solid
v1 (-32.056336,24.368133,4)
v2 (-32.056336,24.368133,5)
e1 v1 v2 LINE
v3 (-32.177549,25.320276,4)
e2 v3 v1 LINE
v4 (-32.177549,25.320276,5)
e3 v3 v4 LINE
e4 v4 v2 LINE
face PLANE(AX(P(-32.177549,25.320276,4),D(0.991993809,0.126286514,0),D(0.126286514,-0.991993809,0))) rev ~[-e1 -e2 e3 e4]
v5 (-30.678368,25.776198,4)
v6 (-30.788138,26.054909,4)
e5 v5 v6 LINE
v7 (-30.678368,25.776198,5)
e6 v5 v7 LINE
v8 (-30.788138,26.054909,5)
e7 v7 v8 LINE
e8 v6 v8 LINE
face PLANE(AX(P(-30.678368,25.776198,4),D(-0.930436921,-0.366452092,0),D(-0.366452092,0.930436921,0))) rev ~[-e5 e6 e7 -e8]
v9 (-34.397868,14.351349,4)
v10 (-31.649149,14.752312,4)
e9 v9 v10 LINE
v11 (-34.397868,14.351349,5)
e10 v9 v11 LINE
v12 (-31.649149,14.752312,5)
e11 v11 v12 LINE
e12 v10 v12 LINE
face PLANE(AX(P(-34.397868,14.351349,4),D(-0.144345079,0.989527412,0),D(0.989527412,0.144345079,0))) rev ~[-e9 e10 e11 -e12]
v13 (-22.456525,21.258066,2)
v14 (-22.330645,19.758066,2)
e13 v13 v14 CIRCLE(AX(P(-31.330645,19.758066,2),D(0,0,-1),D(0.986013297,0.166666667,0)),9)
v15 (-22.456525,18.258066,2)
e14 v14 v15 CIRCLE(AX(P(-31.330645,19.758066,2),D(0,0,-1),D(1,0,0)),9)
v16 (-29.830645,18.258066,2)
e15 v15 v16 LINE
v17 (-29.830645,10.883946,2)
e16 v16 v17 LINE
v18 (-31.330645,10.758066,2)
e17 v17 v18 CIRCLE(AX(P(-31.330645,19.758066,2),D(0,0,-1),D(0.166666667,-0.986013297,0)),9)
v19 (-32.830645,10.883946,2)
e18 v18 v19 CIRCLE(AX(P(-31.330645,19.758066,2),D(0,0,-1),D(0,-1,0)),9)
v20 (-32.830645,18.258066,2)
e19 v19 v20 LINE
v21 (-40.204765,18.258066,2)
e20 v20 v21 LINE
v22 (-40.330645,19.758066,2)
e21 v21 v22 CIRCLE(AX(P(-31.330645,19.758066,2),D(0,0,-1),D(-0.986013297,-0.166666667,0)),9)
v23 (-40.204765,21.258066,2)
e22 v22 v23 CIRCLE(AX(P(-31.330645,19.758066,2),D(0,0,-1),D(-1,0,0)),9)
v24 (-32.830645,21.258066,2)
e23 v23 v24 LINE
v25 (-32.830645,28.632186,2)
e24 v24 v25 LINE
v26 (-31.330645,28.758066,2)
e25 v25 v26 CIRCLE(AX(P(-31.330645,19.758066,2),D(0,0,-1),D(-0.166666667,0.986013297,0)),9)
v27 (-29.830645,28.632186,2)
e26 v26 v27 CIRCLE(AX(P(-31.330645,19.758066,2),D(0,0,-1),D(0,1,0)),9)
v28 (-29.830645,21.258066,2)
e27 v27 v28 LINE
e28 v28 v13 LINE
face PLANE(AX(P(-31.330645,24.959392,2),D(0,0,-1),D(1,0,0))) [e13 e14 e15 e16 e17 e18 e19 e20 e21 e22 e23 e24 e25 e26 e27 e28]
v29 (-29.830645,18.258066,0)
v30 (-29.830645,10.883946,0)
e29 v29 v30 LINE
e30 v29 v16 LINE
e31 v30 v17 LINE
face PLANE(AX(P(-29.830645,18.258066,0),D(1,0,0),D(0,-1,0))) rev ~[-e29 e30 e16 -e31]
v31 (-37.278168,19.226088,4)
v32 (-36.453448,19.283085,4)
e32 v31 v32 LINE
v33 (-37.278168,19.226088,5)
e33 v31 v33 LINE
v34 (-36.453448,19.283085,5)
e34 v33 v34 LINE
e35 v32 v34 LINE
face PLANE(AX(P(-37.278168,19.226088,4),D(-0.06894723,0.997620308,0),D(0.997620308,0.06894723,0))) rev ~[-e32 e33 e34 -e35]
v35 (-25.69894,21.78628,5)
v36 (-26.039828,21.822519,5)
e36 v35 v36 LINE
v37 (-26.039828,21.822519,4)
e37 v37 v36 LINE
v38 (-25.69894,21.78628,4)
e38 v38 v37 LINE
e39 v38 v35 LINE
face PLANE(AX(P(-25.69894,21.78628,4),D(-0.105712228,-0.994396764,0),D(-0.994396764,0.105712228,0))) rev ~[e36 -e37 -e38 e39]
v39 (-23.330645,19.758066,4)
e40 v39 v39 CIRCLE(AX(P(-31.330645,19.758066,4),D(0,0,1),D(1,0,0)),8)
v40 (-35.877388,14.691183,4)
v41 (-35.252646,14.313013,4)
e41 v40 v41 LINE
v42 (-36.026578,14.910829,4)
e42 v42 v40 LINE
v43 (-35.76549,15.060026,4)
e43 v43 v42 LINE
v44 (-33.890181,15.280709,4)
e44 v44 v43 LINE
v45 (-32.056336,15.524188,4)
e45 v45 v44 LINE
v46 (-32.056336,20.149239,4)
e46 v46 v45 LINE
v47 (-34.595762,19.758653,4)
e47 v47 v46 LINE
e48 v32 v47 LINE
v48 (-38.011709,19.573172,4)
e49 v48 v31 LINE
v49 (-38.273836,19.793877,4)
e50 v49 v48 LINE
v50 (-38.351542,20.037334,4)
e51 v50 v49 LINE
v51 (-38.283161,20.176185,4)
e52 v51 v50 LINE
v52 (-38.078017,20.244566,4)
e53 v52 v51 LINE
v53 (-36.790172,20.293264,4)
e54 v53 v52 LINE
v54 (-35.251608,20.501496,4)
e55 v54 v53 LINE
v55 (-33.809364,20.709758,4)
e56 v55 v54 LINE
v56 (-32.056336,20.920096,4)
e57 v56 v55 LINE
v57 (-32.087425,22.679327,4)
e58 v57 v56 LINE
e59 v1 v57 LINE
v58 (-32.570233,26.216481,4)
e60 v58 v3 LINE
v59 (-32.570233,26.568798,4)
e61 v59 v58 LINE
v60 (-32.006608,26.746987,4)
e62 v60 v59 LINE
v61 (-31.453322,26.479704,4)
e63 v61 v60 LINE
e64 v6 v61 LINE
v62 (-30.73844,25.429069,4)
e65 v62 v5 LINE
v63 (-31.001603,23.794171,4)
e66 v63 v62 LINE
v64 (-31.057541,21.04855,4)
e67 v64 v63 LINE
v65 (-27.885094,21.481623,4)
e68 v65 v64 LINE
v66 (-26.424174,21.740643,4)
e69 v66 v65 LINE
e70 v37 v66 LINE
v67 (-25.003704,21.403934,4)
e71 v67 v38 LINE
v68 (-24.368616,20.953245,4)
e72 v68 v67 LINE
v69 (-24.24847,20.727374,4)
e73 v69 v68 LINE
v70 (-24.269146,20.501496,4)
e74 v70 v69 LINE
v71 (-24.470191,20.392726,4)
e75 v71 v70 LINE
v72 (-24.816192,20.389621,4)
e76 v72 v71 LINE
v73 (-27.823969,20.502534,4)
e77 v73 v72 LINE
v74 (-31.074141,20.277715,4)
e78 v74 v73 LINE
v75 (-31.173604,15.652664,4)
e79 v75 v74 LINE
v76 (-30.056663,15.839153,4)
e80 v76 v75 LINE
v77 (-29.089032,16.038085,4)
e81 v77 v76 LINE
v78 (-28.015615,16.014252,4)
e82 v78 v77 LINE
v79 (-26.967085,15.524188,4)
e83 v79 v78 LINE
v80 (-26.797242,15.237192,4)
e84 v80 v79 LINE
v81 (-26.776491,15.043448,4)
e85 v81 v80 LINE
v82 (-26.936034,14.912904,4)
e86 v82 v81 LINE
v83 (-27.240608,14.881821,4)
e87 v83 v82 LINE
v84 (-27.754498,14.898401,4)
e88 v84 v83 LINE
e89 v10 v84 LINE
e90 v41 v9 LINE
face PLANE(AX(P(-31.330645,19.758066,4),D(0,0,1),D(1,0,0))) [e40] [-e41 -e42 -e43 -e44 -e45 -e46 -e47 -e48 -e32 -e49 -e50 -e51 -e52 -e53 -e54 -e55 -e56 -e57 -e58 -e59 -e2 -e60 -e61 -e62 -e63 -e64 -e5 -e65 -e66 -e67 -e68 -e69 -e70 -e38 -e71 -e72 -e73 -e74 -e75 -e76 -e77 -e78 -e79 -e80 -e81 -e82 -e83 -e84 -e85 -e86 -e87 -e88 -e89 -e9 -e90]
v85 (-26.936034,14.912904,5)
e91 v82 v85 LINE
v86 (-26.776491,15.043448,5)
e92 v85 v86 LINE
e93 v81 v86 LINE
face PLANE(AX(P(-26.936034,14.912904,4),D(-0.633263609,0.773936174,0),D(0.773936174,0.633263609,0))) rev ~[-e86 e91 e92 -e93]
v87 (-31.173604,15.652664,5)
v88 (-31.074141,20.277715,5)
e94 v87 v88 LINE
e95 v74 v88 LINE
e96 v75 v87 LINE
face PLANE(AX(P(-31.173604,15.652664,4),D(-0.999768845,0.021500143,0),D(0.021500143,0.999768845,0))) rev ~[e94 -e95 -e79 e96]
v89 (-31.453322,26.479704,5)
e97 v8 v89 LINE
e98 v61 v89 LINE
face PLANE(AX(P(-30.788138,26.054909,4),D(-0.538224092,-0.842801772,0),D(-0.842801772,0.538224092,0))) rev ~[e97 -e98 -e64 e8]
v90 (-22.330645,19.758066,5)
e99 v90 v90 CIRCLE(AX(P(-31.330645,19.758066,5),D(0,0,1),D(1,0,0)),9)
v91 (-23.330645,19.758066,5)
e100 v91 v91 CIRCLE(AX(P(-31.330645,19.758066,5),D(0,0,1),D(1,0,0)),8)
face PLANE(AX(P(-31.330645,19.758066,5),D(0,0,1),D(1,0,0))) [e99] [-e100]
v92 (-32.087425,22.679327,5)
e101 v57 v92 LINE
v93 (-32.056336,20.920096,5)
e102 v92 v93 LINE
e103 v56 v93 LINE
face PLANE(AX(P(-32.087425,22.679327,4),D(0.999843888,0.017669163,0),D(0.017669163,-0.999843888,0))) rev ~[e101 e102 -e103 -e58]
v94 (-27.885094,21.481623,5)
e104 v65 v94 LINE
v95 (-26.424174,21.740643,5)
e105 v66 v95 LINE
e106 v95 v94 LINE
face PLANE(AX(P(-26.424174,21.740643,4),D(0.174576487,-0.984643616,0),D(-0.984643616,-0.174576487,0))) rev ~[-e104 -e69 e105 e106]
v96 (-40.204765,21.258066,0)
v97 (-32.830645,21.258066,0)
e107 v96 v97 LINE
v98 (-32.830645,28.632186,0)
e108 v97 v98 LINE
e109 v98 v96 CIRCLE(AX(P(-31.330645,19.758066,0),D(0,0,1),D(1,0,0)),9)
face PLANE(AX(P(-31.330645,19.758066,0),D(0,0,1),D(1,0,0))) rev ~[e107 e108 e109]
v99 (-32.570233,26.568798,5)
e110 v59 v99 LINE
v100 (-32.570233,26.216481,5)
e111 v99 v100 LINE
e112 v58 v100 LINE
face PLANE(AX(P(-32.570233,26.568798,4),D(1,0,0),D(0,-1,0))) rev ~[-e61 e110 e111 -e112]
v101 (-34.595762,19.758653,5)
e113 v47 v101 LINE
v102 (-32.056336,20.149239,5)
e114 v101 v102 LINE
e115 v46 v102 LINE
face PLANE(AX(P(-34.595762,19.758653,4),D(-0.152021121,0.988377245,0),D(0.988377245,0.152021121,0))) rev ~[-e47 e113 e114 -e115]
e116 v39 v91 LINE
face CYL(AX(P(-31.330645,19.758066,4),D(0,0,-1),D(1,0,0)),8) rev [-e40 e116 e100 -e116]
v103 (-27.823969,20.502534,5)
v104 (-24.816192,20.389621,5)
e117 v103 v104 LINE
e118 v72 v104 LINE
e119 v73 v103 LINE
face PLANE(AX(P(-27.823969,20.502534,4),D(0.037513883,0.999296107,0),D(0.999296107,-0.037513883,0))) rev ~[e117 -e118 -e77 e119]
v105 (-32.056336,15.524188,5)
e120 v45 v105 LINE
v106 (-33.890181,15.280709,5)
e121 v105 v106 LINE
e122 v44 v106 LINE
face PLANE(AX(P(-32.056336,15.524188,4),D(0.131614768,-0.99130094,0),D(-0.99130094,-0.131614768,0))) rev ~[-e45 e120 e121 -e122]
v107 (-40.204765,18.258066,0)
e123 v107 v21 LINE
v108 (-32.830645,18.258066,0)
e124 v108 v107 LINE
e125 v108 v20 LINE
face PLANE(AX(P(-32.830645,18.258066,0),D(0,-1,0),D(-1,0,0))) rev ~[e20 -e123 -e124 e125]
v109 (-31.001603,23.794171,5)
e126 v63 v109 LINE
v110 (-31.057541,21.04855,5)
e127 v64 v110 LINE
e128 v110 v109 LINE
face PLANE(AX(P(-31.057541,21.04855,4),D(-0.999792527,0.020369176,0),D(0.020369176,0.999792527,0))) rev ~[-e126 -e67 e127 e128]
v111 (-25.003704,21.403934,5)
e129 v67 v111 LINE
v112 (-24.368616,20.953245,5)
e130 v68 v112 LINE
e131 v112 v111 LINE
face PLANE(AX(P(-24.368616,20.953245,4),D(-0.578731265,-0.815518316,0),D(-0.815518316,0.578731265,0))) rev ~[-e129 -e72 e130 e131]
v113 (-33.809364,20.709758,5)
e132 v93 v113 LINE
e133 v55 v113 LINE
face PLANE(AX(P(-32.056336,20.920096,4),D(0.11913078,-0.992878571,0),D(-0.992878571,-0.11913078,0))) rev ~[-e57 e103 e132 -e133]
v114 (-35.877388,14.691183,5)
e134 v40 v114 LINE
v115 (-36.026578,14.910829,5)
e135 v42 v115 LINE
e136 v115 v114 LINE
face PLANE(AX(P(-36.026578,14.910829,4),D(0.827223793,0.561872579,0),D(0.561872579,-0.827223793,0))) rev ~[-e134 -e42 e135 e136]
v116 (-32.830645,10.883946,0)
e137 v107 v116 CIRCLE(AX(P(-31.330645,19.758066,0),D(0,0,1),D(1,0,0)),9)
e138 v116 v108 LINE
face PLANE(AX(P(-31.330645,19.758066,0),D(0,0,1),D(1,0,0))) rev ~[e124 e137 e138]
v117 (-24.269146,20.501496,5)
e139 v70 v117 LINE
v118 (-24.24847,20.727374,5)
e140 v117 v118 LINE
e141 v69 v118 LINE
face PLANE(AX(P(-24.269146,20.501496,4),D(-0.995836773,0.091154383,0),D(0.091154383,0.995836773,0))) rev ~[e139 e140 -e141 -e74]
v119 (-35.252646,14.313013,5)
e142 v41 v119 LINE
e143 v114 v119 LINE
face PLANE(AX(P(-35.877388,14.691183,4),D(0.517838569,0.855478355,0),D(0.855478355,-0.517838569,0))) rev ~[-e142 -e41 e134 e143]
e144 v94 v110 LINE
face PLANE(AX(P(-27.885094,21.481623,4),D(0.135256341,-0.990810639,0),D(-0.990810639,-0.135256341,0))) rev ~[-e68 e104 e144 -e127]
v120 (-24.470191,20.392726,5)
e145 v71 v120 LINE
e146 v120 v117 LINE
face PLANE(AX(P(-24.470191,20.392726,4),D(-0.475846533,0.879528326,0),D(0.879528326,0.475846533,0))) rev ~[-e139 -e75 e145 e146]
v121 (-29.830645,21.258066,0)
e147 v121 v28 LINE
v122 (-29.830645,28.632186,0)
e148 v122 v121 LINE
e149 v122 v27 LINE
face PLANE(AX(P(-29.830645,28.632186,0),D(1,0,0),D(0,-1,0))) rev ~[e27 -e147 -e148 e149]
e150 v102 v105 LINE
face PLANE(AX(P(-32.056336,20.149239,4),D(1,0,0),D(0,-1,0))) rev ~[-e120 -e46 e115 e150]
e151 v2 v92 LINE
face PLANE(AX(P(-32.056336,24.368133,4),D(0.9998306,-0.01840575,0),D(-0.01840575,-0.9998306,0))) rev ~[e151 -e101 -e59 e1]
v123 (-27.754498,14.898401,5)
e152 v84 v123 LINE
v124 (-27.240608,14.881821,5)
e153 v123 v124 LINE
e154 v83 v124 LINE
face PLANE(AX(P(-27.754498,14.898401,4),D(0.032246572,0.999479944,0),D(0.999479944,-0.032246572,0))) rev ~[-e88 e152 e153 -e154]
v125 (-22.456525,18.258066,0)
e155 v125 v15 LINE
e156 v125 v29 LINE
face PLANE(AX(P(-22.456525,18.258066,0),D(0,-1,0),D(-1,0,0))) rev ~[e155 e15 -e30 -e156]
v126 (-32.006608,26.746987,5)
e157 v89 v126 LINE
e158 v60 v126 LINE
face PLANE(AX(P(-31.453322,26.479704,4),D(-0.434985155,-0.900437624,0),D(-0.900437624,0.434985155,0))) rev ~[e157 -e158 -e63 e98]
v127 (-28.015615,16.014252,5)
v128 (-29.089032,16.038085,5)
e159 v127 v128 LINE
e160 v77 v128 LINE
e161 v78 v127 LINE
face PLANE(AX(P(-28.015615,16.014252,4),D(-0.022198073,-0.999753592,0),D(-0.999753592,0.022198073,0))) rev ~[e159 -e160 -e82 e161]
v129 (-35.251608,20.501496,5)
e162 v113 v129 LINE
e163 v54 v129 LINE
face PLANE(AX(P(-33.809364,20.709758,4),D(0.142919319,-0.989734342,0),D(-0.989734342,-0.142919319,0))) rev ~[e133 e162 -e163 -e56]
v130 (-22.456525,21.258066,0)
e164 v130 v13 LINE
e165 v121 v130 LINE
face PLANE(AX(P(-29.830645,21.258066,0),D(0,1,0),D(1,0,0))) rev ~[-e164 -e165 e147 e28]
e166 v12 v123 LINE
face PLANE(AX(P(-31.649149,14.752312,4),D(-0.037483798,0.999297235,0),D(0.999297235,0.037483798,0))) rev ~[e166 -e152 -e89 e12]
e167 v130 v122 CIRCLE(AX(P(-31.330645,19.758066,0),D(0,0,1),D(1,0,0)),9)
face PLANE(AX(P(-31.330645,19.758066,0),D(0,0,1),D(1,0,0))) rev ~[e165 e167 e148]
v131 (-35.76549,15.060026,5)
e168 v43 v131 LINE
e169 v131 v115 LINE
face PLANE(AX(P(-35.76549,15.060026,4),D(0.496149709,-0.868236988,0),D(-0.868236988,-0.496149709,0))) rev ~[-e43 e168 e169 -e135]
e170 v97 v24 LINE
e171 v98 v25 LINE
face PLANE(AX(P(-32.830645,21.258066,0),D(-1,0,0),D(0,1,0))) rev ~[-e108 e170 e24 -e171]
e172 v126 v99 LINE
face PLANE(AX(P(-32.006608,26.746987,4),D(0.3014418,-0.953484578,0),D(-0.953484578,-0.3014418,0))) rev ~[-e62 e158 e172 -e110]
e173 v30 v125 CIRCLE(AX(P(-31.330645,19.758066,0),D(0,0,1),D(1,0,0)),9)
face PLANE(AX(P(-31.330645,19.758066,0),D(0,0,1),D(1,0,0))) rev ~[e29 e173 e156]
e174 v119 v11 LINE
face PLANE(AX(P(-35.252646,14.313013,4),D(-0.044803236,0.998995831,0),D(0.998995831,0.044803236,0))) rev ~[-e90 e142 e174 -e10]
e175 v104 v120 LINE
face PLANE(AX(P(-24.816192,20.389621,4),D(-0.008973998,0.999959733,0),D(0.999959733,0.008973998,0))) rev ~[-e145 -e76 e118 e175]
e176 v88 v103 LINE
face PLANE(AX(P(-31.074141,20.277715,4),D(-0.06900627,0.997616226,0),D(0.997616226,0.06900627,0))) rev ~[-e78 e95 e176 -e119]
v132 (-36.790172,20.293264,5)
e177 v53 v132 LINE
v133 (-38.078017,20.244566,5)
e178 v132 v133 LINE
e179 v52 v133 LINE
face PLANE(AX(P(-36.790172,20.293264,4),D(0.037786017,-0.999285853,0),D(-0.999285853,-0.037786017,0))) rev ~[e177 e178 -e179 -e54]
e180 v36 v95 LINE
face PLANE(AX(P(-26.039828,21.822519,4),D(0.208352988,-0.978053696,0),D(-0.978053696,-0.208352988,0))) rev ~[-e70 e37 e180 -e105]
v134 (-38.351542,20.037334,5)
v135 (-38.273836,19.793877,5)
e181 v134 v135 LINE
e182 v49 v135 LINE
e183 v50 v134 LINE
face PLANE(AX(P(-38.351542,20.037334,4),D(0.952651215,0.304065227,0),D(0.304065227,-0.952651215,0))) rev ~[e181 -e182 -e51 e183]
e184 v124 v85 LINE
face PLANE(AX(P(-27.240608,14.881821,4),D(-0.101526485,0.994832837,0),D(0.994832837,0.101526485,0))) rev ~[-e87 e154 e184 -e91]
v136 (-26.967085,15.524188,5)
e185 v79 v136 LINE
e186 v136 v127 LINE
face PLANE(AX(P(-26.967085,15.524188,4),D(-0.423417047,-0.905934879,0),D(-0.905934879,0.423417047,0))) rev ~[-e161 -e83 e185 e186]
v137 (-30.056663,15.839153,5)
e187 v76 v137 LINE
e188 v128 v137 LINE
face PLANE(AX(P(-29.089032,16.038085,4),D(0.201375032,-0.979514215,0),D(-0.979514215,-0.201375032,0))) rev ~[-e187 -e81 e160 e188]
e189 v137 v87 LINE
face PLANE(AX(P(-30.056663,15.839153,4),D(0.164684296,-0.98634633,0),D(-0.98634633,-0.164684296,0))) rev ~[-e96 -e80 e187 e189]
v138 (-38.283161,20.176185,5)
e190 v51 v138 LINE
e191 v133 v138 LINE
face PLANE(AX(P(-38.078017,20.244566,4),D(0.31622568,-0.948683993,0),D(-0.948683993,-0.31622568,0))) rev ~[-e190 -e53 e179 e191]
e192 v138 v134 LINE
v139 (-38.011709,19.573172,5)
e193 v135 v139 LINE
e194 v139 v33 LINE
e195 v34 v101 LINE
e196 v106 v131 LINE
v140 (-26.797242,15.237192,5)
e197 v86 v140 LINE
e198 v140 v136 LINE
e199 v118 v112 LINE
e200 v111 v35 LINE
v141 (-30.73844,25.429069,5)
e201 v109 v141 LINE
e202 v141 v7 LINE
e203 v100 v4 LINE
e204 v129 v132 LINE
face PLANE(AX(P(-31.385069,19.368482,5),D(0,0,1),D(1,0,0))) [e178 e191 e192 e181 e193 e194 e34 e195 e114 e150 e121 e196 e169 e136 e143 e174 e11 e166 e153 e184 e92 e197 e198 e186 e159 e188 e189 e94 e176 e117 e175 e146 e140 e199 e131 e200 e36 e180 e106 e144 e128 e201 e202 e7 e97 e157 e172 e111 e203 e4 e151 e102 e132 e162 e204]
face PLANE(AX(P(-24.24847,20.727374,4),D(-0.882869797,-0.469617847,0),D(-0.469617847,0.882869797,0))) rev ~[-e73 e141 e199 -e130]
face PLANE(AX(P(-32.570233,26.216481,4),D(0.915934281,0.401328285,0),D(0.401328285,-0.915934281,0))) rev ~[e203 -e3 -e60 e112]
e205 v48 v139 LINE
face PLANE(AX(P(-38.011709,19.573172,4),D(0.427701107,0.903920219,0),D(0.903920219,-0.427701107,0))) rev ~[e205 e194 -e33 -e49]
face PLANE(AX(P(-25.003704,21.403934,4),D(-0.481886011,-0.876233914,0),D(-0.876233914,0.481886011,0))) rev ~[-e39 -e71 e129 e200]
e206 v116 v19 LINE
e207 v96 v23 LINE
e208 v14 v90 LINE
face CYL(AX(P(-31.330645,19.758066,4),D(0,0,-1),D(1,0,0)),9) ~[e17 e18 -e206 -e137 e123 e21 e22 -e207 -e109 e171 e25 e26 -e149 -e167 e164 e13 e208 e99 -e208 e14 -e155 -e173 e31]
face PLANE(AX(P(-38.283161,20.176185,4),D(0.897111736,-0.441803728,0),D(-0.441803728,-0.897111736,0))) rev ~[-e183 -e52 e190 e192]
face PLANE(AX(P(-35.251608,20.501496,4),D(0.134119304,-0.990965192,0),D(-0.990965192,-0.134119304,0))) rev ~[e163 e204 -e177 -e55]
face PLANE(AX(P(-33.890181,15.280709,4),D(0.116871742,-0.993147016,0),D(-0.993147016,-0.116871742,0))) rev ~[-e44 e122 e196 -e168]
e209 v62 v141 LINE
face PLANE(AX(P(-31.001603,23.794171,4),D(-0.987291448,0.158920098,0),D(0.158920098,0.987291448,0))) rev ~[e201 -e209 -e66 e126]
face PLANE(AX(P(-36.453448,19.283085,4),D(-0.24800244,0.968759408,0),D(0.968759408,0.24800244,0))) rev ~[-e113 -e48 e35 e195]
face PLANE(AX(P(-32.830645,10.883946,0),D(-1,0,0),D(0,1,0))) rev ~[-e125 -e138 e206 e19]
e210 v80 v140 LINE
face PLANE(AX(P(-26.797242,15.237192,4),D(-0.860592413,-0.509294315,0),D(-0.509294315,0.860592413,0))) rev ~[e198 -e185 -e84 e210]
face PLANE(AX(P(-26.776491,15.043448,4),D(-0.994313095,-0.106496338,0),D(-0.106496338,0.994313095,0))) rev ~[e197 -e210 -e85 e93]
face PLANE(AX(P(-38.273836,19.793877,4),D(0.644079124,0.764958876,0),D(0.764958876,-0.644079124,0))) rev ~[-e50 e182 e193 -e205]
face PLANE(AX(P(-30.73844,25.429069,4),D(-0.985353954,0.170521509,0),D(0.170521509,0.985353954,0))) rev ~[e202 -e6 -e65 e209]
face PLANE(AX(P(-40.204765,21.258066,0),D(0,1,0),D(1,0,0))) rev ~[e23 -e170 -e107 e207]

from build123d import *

# Parameters (mm, degrees)
F0_R     = 9
F1_DEPTH = 4
F3_W     = 3
F3_H     = 3
F4_DEPTH = 2
F2_R     = 9
F2_R_2   = 8
F5_DEPTH = 1
F7_DEPTH = 1


# Not quite as in the source:
# - a feature names something its author has since deleted; it is built from what else it names


with BuildPart() as f1:
    # F0 (on Top) → F1 (new body)
    with BuildSketch(Plane.XY):
        with Locations((-31.3306450844, 19.7580661625)):
            Circle(F0_R)
    extrude(amount=F1_DEPTH)

    # F3 (on face) → F4 (cut)
    with BuildSketch(Plane(origin=(0, 0, 0), x_dir=(1, 0, 0), z_dir=(0, 0, -1))):
        with BuildLine():
            ThreePointArc((-32.8306450844, -28.6321858371), (-32.0832814269, -28.7265408676), (-31.3306450844, -28.7580661625))
            ThreePointArc((-31.3306450844, -28.7580661625), (-30.5780087419, -28.7265408676), (-29.8306450844, -28.6321858371))
            Line((-29.8306450844, -28.6321858371), (-29.8306450844, -21.2580661625))
            Line((-29.8306450844, -21.2580661625), (-32.8306450844, -21.2580661625))
            Line((-32.8306450844, -21.2580661625), (-32.8306450844, -28.6321858371))
        make_face()
        with BuildLine():
            ThreePointArc((-40.204764759, -18.2580661625), (-40.2991197895, -19.0054298199), (-40.3306450844, -19.7580661625))
            ThreePointArc((-40.3306450844, -19.7580661625), (-40.2991197895, -20.510702505), (-40.204764759, -21.2580661625))
            Line((-40.204764759, -21.2580661625), (-32.8306450844, -21.2580661625))
            Line((-32.8306450844, -21.2580661625), (-32.8306450844, -18.2580661625))
            Line((-32.8306450844, -18.2580661625), (-40.204764759, -18.2580661625))
        make_face()
        with Locations((-31.3306450844, -19.7580661625)):
            Rectangle(F3_W, F3_H)
        with BuildLine():
            Line((-29.8306450844, -18.2580661625), (-29.8306450844, -21.2580661625))
            Line((-29.8306450844, -21.2580661625), (-22.4565254097, -21.2580661625))
            ThreePointArc((-22.4565254097, -21.2580661625), (-22.3621703793, -20.510702505), (-22.3306450844, -19.7580661625))
            ThreePointArc((-22.3306450844, -19.7580661625), (-22.3621703793, -19.0054298199), (-22.4565254097, -18.2580661625))
            Line((-22.4565254097, -18.2580661625), (-29.8306450844, -18.2580661625))
        make_face()
        with BuildLine():
            Line((-32.8306450844, -10.8839464878), (-32.8306450844, -18.2580661625))
            Line((-32.8306450844, -18.2580661625), (-29.8306450844, -18.2580661625))
            Line((-29.8306450844, -18.2580661625), (-29.8306450844, -10.8839464878))
            ThreePointArc((-29.8306450844, -10.8839464878), (-30.5780087419, -10.7895914574), (-31.3306450844, -10.7580661625))
            ThreePointArc((-31.3306450844, -10.7580661625), (-32.0832814269, -10.7895914574), (-32.8306450844, -10.8839464878))
        make_face()
    extrude(amount=-F4_DEPTH, mode=Mode.SUBTRACT)

    # F2 (on face) → F5 (join)
    with BuildSketch(Plane.XY.offset(4)):
        with Locations((-31.3306450844, 19.7580661625)):
            Circle(F2_R)
        with Locations((-31.3306450844, 19.7580661625)):
            Circle(F2_R_2, mode=Mode.SUBTRACT)
    extrude(amount=F5_DEPTH)

    # F6 (on face) → F7 (join)
    with BuildSketch(Plane.XY.offset(4)):
        Polygon((-32.0563357805, 20.1492391588), (-32.0563357805, 15.5241883096), (-33.8901808177, 15.2807091812), (-35.7654903866, 15.0600261471), (-36.0265778437, 14.9108290182), (-35.8773882333, 14.6911827853), (-35.2526459317, 14.3130134752), (-34.3978675811, 14.3513488068), (-31.6491488168, 14.7523119557), (-27.7544977602, 14.8984009364), (-27.2406082337, 14.8818211386), (-26.9360337682, 14.9129041244), (-26.7764911822, 15.0434478529), (-26.7972422443, 15.2371920988), (-26.9670851763, 15.5241883096), (-28.0156152913, 16.0142517072), (-29.0890316438, 16.0380853546), (-30.0566626908, 15.8391533431), (-31.1736036441, 15.6526644505), (-31.0741413977, 20.2777152997), (-27.8239687071, 20.5025335092), (-24.8161924809, 20.3896206649), (-24.4701910762, 20.3927258057), (-24.2691463661, 20.5014959561), (-24.248470489, 20.7273742743), (-24.368616131, 20.9532450739), (-25.0037038896, 21.403934083), (-25.6989396543, 21.7862799203), (-26.0398284784, 21.8225190939), (-26.4241742369, 21.7406426207), (-27.8850941182, 21.4816227513), (-31.057540548, 21.0485495894), (-31.0016029024, 23.7941707314), (-30.738440339, 25.4290687202), (-30.678367518, 25.7761979), (-30.788137629, 26.0549087229), (-31.4533219461, 26.4797040154), (-32.0066084166, 26.7469867172), (-32.5702328255, 26.5687982493), (-32.5702328255, 26.2164813041), (-32.1775490497, 25.3202760143), (-32.0563357805, 24.3681330789), (-32.0874247812, 22.6793274398), (-32.0563357805, 20.9200960041), (-33.8093644531, 20.709758427), (-35.2516083786, 20.5014959561), (-36.7901718172, 20.2932635593), (-38.0780173149, 20.2445662299), (-38.2831611116, 20.1761854655), (-38.351541876, 20.0373337936), (-38.2738359152, 19.7938772208), (-38.0117086494, 19.5731716311), (-37.2781676271, 19.2260875624), (-36.4534482425, 19.2830853166), (-34.5957620394, 19.7586530447), align=None)
    extrude(amount=F7_DEPTH)


solid = f1.part
